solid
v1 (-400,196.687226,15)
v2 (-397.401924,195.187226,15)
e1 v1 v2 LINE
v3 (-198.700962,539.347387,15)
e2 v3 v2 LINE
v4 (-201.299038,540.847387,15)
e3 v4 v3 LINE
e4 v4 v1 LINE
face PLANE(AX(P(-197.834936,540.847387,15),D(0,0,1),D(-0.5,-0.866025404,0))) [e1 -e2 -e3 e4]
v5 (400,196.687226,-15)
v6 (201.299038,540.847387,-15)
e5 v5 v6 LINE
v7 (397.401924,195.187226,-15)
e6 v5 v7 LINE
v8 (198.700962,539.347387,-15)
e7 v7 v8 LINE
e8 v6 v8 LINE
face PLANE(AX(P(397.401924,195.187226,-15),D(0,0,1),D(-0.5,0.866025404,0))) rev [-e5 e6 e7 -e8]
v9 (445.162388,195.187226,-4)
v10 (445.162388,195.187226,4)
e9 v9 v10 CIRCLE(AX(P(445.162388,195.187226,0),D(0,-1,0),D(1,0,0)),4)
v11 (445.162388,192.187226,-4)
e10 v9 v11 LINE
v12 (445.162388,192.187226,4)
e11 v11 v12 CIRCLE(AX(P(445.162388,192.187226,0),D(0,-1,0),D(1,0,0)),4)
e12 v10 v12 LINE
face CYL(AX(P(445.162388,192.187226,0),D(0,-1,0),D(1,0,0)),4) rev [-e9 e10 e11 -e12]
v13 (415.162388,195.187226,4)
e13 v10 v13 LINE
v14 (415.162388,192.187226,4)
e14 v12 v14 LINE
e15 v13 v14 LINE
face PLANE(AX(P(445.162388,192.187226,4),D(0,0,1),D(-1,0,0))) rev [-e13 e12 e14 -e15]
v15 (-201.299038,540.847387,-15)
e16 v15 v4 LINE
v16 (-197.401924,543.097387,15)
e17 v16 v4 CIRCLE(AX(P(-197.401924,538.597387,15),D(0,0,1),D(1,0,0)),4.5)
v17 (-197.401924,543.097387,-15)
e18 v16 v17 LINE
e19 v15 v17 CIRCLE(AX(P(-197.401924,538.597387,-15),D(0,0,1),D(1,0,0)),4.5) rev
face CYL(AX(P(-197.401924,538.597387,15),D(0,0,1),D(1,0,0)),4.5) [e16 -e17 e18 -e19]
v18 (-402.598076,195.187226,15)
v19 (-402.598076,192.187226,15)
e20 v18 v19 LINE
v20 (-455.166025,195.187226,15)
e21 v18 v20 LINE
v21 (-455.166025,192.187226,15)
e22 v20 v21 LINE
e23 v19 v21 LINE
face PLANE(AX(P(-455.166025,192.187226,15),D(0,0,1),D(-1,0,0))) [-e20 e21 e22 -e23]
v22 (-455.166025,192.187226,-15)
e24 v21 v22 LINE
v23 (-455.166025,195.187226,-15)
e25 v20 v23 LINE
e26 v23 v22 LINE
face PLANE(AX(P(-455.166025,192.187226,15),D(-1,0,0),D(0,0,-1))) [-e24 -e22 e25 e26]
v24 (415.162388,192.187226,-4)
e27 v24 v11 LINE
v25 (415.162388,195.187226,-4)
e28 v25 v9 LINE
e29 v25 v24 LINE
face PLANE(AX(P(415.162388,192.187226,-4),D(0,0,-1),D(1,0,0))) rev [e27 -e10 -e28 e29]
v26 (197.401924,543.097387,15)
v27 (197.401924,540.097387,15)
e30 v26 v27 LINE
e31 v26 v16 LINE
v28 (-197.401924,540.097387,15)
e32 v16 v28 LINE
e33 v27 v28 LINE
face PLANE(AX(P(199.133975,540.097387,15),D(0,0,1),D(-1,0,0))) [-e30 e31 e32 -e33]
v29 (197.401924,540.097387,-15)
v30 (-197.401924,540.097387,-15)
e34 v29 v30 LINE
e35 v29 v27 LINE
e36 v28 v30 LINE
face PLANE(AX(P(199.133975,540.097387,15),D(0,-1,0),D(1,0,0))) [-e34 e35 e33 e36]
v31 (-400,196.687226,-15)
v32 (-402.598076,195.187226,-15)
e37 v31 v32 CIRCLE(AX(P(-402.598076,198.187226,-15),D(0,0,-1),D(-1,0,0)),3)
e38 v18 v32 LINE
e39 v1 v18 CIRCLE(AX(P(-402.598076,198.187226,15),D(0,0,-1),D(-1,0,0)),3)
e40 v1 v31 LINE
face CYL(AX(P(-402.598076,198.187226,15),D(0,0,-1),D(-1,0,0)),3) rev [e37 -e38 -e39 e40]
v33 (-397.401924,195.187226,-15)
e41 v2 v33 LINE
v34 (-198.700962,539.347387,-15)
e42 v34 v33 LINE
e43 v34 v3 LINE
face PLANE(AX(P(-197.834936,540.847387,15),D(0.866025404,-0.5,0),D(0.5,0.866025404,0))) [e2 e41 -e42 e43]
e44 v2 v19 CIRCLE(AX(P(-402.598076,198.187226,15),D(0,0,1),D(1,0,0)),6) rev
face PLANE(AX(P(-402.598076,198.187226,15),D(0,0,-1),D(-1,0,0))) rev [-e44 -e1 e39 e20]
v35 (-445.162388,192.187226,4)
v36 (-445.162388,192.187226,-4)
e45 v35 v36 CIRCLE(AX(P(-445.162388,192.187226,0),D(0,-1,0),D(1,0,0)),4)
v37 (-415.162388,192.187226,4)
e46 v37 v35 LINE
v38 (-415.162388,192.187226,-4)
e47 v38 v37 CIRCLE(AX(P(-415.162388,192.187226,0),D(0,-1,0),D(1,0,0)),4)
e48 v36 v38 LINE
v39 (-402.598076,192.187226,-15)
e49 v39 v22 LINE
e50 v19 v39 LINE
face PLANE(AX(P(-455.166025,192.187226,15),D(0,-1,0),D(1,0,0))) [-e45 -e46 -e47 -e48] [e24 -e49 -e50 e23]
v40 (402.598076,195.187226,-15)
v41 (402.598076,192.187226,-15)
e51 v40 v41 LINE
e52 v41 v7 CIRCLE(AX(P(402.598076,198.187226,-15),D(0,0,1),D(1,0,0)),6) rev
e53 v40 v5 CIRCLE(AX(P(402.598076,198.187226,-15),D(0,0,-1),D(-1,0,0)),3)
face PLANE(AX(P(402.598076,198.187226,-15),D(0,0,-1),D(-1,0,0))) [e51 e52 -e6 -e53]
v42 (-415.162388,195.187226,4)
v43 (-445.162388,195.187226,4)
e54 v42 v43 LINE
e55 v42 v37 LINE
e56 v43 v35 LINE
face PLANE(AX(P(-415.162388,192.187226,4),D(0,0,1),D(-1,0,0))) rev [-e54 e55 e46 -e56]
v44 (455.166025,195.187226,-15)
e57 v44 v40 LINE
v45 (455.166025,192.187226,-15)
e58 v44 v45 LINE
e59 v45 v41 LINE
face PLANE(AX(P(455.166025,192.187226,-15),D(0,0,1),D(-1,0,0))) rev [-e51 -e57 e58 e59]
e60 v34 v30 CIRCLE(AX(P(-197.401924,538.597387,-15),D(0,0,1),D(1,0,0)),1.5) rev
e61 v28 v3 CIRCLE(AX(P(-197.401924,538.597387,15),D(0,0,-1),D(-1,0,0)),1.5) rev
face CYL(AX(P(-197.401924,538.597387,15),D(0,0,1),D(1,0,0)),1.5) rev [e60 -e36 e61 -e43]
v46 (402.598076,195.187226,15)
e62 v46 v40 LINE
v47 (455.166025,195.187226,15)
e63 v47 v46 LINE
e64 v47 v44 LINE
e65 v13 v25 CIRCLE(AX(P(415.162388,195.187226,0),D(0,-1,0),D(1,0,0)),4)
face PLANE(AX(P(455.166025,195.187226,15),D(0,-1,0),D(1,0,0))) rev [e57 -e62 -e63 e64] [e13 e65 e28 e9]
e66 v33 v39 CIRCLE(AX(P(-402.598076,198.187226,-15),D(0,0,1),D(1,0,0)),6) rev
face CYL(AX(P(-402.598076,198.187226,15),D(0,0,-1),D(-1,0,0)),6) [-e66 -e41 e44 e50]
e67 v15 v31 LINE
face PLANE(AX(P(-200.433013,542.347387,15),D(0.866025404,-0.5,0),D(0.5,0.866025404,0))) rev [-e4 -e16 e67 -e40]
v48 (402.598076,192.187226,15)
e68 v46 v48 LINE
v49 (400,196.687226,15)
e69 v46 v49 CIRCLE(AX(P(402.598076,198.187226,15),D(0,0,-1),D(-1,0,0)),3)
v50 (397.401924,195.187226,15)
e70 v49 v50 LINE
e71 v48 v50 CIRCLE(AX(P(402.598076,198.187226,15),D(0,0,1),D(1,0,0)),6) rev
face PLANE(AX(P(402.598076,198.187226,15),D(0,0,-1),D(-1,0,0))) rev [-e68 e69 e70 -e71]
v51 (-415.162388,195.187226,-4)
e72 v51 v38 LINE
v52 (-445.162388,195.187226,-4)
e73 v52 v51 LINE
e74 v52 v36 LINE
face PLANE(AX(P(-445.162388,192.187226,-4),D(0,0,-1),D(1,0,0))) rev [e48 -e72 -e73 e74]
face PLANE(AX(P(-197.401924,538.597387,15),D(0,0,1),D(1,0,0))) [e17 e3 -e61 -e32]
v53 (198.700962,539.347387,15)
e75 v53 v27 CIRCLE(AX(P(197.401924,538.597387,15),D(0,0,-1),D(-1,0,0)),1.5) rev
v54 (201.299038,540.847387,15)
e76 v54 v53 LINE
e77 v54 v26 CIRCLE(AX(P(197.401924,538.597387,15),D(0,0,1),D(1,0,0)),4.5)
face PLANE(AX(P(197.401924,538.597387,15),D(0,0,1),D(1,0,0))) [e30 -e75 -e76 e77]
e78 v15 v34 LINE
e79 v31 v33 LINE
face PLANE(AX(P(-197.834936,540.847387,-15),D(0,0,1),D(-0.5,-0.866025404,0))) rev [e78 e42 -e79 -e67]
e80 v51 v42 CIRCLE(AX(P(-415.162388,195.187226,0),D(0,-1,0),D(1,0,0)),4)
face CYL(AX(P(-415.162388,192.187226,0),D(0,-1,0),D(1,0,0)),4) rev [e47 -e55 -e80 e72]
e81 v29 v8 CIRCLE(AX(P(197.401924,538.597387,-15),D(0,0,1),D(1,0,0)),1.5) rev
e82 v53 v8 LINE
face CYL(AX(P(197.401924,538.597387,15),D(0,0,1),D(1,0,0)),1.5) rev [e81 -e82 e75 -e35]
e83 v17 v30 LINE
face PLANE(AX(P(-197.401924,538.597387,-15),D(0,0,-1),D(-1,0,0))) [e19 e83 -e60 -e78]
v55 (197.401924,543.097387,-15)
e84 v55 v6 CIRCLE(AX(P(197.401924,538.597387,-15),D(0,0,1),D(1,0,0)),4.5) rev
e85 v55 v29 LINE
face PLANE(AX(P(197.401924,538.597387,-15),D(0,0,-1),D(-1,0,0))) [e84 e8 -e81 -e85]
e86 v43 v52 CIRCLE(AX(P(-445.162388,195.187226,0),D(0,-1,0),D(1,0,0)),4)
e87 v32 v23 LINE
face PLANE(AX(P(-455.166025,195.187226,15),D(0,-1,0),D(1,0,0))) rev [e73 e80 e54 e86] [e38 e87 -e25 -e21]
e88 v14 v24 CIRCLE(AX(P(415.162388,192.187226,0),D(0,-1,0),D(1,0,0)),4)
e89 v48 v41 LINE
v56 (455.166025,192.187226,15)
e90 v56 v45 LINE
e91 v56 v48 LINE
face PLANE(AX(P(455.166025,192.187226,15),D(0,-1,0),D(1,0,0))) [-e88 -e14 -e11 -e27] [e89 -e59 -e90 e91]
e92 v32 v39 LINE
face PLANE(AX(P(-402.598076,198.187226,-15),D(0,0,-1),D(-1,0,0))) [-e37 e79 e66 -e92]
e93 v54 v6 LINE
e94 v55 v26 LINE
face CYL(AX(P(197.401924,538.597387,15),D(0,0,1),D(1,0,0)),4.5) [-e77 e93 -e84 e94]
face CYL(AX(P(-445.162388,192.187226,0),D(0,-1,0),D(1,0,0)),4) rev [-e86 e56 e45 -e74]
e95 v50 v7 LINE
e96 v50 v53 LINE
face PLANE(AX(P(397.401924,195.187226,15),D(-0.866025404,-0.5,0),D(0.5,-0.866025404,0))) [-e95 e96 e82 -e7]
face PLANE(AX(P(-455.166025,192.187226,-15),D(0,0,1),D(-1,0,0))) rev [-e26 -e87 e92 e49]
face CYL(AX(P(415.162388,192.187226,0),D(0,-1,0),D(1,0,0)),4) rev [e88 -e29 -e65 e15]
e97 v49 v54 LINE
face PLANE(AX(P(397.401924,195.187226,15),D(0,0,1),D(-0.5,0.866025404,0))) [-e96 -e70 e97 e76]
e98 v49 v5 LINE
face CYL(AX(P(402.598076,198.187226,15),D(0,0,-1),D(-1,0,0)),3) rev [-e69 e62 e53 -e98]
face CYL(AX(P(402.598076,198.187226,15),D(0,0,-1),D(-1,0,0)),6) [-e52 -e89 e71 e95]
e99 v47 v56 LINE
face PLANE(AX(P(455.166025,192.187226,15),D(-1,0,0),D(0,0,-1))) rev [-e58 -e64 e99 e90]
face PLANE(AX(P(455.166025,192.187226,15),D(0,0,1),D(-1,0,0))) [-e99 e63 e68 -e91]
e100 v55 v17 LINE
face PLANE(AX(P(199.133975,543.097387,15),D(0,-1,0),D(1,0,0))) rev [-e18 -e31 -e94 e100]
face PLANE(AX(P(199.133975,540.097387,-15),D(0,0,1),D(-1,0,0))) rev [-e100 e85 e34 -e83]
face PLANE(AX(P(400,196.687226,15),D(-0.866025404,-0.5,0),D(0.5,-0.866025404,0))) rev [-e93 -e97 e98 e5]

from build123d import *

# Parameters (mm, degrees)
EXTRUDE_1_DEPTH       = 15
CUT_EXTRUDE_1_REACH   = 576.925
SHEET_START           = -15
SHEET_METAL_2_DEPTH   = 30
SHEET_METAL_2_2_DEPTH = 30


# Read off the part's stored shape, not the designer's step: Преобразовать-Твердое тело2
with BuildPart() as part:
    # Эскиз1 → Вытянуть-Тонкостенный1 (new, symmetric)
    with BuildSketch(Plane.XY):
        with BuildLine():
            Line((-455.166025404, 195.187225691), (-402.598076211, 195.187225691))
            ThreePointArc((-402.598076211, 195.187225691), (-401.098076211, 195.58914948), (-400, 196.687225691))
            Line((-400, 196.687225691), (-200.433012702, 542.347387205))
            ThreePointArc((-200.433012702, 542.347387205), (-199.883974596, 542.896425311), (-199.133974596, 543.097387205))
            Line((-199.133974596, 543.097387205), (199.133974596, 543.097387205))
            ThreePointArc((199.133974596, 543.097387205), (199.883974596, 542.896425311), (200.433012702, 542.347387205))
            Line((200.433012702, 542.347387205), (400, 196.687225691))
            ThreePointArc((400, 196.687225691), (401.098076211, 195.58914948), (402.598076211, 195.187225691))
            Line((402.598076211, 195.187225691), (455.166025404, 195.187225691))
            Line((455.166025404, 195.187225691), (455.166025404, 192.187225691))
            Line((455.166025404, 192.187225691), (402.598076211, 192.187225691))
            ThreePointArc((402.598076211, 192.187225691), (399.598076211, 192.991073269), (397.401923789, 195.187225691))
            Line((397.401923789, 195.187225691), (198.267949192, 540.097387205))
            Line((198.267949192, 540.097387205), (-198.267949192, 540.097387205))
            Line((-198.267949192, 540.097387205), (-397.401923789, 195.187225691))
            ThreePointArc((-397.401923789, 195.187225691), (-399.598076211, 192.991073269), (-402.598076211, 192.187225691))
            Line((-402.598076211, 192.187225691), (-455.166025404, 192.187225691))
            Line((-455.166025404, 192.187225691), (-455.166025404, 195.187225691))
        make_face()
    extrude(amount=EXTRUDE_1_DEPTH, both=True)

    # Эскиз2 → Вырез-Вытянуть1 (cut, up to next)
    with BuildSketch(Plane.XZ.offset(-192.187225691), mode=Mode.PRIVATE) as cut_extrude_1_sk1:
        with BuildLine():
            Line((-445.16238786, -4), (-415.16238786, -4))
            ThreePointArc((-415.16238786, -4), (-411.16238786, 0), (-415.16238786, 4))
            Line((-415.16238786, 4), (-445.16238786, 4))
            ThreePointArc((-445.16238786, 4), (-449.16238786, 0), (-445.16238786, -4))
        make_face()
    cut_extrude_1_tool1 = extrude(cut_extrude_1_sk1.sketch, amount=-CUT_EXTRUDE_1_REACH, mode=Mode.PRIVATE) & part.part
    # Эскиз2 → Вырез-Вытянуть1 (cut, up to next)
    with BuildSketch(Plane.XZ.offset(-192.187225691), mode=Mode.PRIVATE) as cut_extrude_1_sk2:
        with BuildLine():
            Line((445.16238786, 4), (415.16238786, 4))
            ThreePointArc((415.16238786, 4), (411.16238786, 0), (415.16238786, -4))
            Line((415.16238786, -4), (445.16238786, -4))
            ThreePointArc((445.16238786, -4), (449.16238786, 0), (445.16238786, 4))
        make_face()
    cut_extrude_1_tool2 = extrude(cut_extrude_1_sk2.sketch, amount=-CUT_EXTRUDE_1_REACH, mode=Mode.PRIVATE) & part.part
    add(cut_extrude_1_tool1.solids().sort_by_distance((-430.162388, 192.187226, 0))[0], mode=Mode.SUBTRACT)
    add(cut_extrude_1_tool2.solids().sort_by_distance((430.162388, 192.187226, 0))[0], mode=Mode.SUBTRACT)

    # Sheet Metal 2 outline → Sheet Metal 2 (cut)
    with BuildSketch(Plane.XY.offset(SHEET_START)):
        with BuildLine():
            Line((199.133974596, 543.097387205), (197.401923789, 543.097387205))
            ThreePointArc((197.401923789, 543.097387205), (199.651923789, 542.494501522), (201.299038106, 540.847387205))
            Line((201.299038106, 540.847387205), (200.433012702, 542.347387205))
            ThreePointArc((200.433012702, 542.347387205), (199.883974596, 542.896425311), (199.133974596, 543.097387205))
        make_face()
        with BuildLine():
            ThreePointArc((-201.299038106, 540.847387205), (-199.651923789, 542.494501522), (-197.401923789, 543.097387205))
            Line((-197.401923789, 543.097387205), (-199.133974596, 543.097387205))
            ThreePointArc((-199.133974596, 543.097387205), (-199.883974596, 542.896425311), (-200.433012702, 542.347387205))
            Line((-200.433012702, 542.347387205), (-201.299038106, 540.847387205))
        make_face()
    extrude(amount=SHEET_METAL_2_DEPTH, mode=Mode.SUBTRACT)

    # Sheet Metal 2 2 outline → Sheet Metal 2 2 (add)
    with BuildSketch(Plane.XY.offset(SHEET_START)):
        with BuildLine():
            Line((198.267949192, 540.097387205), (197.401923789, 540.097387205))
            ThreePointArc((197.401923789, 540.097387205), (198.151923789, 539.896425311), (198.700961894, 539.347387205))
            Line((198.700961894, 539.347387205), (198.267949192, 540.097387205))
        make_face()
        with BuildLine():
            ThreePointArc((-198.700961894, 539.347387205), (-198.151923789, 539.896425311), (-197.401923789, 540.097387205))
            Line((-197.401923789, 540.097387205), (-198.267949192, 540.097387205))
            Line((-198.267949192, 540.097387205), (-198.700961894, 539.347387205))
        make_face()
    extrude(amount=SHEET_METAL_2_2_DEPTH)


solid = part.part
